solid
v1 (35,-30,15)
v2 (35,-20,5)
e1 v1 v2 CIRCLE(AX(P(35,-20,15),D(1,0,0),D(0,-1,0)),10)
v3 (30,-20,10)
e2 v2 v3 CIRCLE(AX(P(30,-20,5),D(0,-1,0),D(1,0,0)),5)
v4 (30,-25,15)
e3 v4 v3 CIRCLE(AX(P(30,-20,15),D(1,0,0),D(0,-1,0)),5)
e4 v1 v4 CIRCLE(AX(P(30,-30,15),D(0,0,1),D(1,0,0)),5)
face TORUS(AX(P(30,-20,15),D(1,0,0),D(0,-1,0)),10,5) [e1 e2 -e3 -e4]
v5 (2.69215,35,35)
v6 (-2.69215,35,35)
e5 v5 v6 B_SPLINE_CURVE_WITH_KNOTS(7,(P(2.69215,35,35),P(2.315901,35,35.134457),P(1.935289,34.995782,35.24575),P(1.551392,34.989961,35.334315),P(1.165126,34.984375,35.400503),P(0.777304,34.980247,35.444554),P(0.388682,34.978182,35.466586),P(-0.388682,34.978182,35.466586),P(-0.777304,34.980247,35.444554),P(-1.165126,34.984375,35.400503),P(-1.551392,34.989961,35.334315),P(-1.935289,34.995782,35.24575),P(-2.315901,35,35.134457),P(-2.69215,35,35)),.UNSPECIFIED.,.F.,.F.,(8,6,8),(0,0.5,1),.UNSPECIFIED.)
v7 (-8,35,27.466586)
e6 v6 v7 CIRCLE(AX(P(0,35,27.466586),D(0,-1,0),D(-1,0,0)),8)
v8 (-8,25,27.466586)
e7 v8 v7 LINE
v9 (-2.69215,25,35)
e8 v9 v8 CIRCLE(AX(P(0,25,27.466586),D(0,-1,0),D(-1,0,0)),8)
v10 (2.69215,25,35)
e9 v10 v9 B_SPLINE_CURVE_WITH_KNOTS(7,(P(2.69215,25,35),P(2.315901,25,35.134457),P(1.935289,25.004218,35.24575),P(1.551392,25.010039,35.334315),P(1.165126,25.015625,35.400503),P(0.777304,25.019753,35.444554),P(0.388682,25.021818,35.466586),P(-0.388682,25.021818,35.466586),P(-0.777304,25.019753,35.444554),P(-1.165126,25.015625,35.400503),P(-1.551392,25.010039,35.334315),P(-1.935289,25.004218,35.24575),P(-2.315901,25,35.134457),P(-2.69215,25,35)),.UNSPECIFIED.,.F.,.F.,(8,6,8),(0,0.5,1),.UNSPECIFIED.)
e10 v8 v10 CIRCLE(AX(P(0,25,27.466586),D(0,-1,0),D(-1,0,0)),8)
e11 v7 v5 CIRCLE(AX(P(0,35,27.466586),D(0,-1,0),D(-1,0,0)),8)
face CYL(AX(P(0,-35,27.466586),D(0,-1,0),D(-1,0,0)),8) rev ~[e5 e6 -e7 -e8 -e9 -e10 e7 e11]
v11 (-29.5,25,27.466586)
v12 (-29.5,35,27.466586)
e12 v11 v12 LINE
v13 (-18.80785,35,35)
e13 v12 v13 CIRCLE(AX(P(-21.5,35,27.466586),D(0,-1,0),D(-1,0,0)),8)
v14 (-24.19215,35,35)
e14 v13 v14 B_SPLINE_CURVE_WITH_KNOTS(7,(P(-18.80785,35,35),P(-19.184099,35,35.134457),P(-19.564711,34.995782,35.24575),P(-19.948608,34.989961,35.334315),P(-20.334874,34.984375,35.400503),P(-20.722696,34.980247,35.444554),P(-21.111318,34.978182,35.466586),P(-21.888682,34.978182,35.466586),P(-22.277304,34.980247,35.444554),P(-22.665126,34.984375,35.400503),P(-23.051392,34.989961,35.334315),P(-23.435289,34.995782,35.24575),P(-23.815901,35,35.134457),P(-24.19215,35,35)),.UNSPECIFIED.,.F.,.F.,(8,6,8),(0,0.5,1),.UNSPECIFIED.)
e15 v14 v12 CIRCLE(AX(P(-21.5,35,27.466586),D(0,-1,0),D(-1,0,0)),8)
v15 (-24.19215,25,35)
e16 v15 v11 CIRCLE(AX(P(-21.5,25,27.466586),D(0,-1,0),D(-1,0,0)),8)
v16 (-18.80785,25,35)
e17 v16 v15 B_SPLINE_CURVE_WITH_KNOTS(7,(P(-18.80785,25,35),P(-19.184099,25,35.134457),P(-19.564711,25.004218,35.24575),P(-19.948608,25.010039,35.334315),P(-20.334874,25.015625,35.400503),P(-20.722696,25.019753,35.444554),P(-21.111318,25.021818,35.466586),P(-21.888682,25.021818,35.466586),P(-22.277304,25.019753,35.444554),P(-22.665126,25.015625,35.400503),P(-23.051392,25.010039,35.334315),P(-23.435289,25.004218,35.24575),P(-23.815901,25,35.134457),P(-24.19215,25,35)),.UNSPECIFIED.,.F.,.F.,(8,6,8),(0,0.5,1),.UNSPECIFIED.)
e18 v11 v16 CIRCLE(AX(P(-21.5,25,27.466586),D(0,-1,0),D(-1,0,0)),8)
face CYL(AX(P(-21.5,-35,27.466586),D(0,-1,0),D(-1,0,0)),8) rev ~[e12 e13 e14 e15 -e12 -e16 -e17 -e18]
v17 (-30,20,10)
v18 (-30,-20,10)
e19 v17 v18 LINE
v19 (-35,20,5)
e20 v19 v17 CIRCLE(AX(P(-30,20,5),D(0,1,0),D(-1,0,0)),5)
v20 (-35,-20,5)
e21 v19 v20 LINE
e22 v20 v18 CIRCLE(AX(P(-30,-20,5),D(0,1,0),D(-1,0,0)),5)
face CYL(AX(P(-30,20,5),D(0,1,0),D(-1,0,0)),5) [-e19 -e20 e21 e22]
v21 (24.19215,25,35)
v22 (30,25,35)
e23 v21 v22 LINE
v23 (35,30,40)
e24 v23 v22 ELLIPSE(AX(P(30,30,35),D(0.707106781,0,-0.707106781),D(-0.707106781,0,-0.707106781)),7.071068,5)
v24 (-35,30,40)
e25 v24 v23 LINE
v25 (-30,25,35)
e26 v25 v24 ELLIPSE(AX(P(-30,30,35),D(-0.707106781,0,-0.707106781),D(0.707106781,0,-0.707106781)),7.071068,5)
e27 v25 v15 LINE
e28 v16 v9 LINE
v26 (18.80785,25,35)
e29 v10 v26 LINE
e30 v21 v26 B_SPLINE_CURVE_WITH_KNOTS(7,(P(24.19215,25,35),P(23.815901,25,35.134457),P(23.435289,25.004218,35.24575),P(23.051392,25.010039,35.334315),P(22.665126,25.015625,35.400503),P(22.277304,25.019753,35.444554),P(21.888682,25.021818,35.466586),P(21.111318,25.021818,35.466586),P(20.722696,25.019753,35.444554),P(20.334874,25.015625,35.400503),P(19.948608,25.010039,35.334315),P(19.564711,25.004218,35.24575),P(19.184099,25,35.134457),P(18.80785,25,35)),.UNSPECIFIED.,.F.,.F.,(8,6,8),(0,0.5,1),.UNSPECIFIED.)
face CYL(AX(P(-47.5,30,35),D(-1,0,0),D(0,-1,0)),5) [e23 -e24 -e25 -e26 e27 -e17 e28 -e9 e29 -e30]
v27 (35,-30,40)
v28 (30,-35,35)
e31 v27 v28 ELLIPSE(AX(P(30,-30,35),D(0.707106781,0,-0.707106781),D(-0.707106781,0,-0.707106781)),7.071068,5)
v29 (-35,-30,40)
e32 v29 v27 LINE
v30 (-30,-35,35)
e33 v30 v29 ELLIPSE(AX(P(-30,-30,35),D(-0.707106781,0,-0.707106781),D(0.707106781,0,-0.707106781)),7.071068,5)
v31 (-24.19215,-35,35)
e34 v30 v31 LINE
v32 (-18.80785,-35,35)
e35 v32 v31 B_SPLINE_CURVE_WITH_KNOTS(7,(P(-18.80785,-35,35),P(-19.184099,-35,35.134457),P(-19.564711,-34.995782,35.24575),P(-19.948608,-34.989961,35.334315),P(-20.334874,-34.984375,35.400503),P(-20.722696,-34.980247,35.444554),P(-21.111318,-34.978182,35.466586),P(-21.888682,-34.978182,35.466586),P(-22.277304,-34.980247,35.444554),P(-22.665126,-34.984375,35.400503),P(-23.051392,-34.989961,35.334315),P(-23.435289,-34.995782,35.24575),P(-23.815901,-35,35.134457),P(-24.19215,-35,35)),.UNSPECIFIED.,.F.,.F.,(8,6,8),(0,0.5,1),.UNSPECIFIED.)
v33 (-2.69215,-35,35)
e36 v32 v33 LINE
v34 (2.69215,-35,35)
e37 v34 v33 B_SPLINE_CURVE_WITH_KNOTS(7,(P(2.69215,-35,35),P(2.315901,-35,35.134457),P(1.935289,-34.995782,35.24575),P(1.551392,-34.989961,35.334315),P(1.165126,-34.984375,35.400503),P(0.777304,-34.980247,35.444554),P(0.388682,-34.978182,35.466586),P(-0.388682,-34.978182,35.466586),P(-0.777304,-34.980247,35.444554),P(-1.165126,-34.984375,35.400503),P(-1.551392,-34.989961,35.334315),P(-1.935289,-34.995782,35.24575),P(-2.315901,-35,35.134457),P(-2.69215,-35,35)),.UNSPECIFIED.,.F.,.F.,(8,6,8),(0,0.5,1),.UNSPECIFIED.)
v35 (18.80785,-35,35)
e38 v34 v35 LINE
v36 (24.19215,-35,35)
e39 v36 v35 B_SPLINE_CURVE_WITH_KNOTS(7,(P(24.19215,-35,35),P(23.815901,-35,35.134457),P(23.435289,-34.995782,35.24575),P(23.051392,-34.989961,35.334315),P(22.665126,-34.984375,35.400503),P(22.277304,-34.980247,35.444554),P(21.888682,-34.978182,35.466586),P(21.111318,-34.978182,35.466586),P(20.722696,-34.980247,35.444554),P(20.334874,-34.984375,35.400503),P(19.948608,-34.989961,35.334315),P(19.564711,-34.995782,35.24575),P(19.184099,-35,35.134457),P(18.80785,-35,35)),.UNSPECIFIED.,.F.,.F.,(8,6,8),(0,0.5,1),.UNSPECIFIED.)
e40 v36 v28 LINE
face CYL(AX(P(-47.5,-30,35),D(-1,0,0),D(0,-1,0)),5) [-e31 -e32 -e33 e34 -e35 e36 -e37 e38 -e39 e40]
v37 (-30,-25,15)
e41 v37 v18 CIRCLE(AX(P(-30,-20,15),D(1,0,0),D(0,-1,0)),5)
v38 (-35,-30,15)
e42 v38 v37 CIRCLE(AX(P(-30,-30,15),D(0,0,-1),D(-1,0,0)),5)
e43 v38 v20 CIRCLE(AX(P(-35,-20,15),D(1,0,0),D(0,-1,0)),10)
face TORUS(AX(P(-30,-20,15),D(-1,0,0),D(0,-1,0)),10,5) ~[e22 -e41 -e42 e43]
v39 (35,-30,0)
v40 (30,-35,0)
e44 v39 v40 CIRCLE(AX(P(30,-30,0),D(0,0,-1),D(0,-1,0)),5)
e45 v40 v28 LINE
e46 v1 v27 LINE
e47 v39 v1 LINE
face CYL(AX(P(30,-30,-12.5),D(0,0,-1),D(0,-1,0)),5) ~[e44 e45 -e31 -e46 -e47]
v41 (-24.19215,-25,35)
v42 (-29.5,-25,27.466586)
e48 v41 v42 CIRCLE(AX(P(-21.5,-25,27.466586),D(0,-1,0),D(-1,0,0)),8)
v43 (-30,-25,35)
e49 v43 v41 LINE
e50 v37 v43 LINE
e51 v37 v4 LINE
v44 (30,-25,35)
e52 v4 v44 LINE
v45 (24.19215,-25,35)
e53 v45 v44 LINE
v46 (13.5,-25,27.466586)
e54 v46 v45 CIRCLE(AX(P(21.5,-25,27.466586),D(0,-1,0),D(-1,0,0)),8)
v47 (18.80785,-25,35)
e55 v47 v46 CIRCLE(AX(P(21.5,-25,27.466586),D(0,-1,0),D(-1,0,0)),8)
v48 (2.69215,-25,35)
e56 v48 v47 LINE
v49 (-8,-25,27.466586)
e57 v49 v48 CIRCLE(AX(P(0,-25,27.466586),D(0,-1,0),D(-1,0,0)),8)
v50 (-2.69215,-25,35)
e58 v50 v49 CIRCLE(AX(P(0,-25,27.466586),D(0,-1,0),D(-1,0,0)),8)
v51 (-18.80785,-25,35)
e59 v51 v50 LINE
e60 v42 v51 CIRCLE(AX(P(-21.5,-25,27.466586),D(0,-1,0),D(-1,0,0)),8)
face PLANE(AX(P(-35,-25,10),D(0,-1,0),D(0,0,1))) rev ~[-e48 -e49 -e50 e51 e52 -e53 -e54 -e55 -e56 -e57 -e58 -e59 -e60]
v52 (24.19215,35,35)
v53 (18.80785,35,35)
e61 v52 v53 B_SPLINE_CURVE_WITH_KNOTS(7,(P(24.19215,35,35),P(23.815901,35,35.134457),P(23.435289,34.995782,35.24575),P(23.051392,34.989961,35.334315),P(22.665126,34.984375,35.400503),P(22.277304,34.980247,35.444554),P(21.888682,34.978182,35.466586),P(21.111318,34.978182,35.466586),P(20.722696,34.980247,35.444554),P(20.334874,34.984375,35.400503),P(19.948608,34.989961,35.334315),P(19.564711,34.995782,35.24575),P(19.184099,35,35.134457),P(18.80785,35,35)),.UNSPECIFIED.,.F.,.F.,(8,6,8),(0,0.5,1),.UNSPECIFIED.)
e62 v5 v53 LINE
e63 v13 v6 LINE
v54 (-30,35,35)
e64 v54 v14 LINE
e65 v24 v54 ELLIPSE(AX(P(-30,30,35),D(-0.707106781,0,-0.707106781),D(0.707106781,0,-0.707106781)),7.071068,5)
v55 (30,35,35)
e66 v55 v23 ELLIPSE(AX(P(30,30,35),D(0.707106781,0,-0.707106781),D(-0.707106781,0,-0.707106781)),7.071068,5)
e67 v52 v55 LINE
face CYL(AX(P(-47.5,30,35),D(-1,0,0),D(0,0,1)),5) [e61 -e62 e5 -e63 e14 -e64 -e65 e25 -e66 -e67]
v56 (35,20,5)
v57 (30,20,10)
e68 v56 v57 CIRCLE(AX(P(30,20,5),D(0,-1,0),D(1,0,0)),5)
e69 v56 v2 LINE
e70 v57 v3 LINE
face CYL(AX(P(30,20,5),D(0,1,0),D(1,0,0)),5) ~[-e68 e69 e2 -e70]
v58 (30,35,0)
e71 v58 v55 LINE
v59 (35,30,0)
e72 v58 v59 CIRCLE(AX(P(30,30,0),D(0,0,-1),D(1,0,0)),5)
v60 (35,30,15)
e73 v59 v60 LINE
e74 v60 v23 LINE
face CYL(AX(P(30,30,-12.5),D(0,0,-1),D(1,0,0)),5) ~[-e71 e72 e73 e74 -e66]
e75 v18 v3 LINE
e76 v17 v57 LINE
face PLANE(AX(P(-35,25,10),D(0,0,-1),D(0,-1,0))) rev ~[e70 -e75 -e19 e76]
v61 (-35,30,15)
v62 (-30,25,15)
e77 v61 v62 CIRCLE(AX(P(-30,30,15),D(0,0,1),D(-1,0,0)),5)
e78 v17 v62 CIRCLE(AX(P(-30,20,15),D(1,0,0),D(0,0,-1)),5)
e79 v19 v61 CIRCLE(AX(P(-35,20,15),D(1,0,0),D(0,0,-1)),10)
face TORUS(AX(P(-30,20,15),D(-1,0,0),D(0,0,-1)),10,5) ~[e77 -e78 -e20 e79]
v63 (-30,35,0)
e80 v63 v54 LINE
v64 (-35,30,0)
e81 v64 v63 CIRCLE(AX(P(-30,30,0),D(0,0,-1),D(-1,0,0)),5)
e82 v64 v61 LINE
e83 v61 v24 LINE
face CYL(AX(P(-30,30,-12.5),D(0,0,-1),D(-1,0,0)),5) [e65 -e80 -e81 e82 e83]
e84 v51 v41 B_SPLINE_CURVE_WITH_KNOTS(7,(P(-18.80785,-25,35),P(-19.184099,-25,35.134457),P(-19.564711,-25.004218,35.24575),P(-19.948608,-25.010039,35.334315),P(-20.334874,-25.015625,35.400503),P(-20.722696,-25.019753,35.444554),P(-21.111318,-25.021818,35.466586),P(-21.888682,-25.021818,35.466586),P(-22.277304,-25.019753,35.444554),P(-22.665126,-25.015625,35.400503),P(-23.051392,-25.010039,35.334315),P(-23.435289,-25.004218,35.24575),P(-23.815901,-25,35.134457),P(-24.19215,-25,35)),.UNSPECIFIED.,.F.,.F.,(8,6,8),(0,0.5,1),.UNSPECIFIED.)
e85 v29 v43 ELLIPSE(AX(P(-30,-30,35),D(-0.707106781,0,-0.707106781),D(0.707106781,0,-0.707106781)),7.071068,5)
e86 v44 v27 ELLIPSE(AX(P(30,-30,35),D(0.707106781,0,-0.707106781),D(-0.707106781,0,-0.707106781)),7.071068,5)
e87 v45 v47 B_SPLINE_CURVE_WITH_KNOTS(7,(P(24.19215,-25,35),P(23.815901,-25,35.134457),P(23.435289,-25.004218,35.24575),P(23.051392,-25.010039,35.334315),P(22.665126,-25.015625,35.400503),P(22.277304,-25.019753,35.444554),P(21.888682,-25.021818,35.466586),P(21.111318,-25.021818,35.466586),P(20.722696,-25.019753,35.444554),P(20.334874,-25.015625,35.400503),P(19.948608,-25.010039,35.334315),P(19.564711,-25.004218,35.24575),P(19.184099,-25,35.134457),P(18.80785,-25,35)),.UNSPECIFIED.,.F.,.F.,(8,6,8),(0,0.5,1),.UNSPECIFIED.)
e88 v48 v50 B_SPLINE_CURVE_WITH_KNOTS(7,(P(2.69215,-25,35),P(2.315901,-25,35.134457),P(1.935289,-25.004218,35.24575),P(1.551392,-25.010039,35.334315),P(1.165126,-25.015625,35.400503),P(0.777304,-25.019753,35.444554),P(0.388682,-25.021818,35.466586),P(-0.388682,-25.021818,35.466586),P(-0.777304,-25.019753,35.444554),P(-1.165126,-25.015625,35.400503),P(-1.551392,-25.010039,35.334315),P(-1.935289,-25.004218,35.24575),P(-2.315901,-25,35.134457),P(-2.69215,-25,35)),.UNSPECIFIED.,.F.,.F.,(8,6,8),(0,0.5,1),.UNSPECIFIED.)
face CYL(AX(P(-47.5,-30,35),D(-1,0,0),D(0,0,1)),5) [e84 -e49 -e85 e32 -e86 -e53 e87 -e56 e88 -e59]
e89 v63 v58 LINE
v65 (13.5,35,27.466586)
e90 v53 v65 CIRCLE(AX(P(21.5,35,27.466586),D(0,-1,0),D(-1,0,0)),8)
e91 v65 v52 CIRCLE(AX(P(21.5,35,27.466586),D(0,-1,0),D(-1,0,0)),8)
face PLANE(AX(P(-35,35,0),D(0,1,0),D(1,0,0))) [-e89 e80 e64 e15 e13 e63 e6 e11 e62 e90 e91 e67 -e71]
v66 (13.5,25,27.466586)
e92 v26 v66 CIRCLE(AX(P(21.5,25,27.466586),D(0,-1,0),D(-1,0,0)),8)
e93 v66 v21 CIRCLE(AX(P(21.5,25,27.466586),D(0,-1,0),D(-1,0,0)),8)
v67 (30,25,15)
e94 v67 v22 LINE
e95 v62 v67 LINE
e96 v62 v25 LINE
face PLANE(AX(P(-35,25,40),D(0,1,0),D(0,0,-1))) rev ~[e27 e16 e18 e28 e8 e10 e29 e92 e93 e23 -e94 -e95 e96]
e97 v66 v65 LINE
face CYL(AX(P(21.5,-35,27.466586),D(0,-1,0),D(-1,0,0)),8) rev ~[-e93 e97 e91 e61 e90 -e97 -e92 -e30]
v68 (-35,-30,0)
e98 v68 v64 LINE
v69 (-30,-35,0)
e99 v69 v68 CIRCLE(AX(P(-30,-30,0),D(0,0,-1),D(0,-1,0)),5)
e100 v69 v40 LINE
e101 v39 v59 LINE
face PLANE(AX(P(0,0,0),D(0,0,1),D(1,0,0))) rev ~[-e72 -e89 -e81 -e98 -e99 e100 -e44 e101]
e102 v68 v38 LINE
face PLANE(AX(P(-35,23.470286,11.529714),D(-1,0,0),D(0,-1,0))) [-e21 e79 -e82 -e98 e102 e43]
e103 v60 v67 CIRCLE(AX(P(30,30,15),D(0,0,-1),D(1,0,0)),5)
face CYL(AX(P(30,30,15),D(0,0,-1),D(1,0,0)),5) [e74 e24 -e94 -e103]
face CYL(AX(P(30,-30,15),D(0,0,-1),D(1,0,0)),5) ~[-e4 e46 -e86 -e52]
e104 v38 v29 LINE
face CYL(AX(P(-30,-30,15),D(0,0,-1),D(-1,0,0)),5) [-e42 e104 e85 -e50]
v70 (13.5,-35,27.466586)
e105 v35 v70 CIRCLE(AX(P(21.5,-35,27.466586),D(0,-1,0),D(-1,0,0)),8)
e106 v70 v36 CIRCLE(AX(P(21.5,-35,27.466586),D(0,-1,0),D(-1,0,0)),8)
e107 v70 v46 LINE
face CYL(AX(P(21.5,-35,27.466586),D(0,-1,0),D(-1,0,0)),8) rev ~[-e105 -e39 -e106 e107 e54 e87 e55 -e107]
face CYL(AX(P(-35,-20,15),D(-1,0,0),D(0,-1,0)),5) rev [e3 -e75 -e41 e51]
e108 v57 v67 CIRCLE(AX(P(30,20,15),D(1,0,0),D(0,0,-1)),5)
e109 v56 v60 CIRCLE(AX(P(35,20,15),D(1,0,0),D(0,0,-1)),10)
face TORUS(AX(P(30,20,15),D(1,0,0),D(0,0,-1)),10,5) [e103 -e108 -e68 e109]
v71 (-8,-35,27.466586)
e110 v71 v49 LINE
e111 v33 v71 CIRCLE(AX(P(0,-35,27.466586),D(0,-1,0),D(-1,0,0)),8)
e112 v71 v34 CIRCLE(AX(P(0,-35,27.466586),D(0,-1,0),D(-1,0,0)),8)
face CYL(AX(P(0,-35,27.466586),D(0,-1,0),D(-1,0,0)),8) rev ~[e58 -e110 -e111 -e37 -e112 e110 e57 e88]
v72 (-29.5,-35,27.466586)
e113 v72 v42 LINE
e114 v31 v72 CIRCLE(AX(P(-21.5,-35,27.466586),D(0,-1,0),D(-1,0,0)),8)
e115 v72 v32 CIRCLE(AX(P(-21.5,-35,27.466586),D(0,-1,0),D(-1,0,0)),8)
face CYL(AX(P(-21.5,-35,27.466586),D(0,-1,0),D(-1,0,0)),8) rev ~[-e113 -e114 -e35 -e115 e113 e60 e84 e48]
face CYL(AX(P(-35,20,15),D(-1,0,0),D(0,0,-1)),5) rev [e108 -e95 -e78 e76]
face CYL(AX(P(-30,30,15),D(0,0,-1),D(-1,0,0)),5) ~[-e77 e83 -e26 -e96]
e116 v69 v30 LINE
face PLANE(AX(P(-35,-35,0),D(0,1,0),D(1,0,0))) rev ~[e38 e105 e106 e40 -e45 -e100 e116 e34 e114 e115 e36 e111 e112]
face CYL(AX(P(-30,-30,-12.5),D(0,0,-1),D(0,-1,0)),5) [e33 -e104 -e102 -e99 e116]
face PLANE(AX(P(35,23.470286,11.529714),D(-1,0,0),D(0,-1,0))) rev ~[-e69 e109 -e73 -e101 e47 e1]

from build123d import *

# Parameters (mm, degrees)
F0_W         = 70
F0_H         = 70
F1_DEPTH     = 40
F3_DEPTH     = 78
F4_W         = 25
F4_H         = 17.3788098246
F5_DEPTH     = 72.2
F6_T1_DEPTH  = 70
F6_T3_DEPTH  = 40
F6_T5_DEPTH  = 65
F6_T7_DEPTH  = 37.5
F6_T9_DEPTH  = 95
F6_T12_ANGLE = 90
F6_T14_ANGLE = 90
F6_T16_ANGLE = 90
F6_T18_ANGLE = 90


# Not quite as in the source:
# - a fillet or chamfer that OpenCascade refuses, or shapes differently, is made with other operations: its cross-section is extruded or revolved along the edge and cut away or added
# - a feature names something its author has since deleted; it is built from what else it names


with BuildPart() as f1:
    # F0 (on Top) → F1 (new body)
    with BuildSketch(Plane.XY):
        Rectangle(F0_W, F0_H)
    extrude(amount=F1_DEPTH)

    # F2 (on face) → F3 (cut)
    with BuildSketch(Plane.XZ.offset(35)):
        with BuildLine():
            ThreePointArc((29.5, 27.4665858597), (21.5, 35.4665858597), (13.5, 27.4665858597))
            ThreePointArc((13.5, 27.4665858597), (21.5, 19.4665858597), (29.5, 27.4665858597))
        make_face()
        with BuildLine():
            ThreePointArc((8, 27.4665858597), (0, 35.4665858597), (-8, 27.4665858597))
            ThreePointArc((-8, 27.4665858597), (0, 19.4665858597), (8, 27.4665858597))
        make_face()
        with BuildLine():
            ThreePointArc((-13.5, 27.4665858597), (-21.5, 35.4665858597), (-29.5, 27.4665858597))
            ThreePointArc((-29.5, 27.4665858597), (-21.5, 19.4665858597), (-13.5, 27.4665858597))
        make_face()
    extrude(amount=-F3_DEPTH, mode=Mode.SUBTRACT)

    # F4 (on face) → F5 (cut)
    with BuildSketch(Plane(origin=(-35, 0, 0), x_dir=(0, -1, 0), z_dir=(-1, 0, 0))):
        with Locations((-12.5, 31.3105950877)):
            Rectangle(F4_W, F4_H)
        with Locations((12.5, 31.3105950877)):
            Rectangle(F4_W, F4_H)
        Polygon((25, 22.6211901754), (0, 22.6211901754), (-25, 22.6211901754), (-25, 10), (25, 10), align=None)
    extrude(amount=-F5_DEPTH, mode=Mode.SUBTRACT)

    # F6: fillet of radius 5 on 16 edges, made by hand

    # F6_s2 → F6_t1 (join)
    with BuildSketch(Plane.YZ.offset(-35)):
        with BuildLine():
            ThreePointArc((20, 10), (23.5355339059, 11.4644660941), (25, 15))
            Line((25, 15), (25, 10))
            Line((25, 10), (20, 10))
        make_face()
        with BuildLine():
            ThreePointArc((-25, 15), (-23.5355339059, 11.4644660941), (-20, 10))
            Line((-20, 10), (-25, 10))
            Line((-25, 10), (-25, 15))
        make_face()
    extrude(amount=F6_T1_DEPTH)

    # F6_s4 → F6_t3 (cut)
    with BuildSketch(Plane.XZ.offset(-20)):
        with BuildLine():
            ThreePointArc((35, 5), (33.5355339059, 8.5355339059), (30, 10))
            Line((30, 10), (35, 10))
            Line((35, 10), (35, 5))
        make_face()
        with BuildLine():
            ThreePointArc((-35, 5), (-33.5355339059, 8.5355339059), (-30, 10))
            Line((-30, 10), (-35, 10))
            Line((-35, 10), (-35, 5))
        make_face()
    extrude(amount=F6_T3_DEPTH, mode=Mode.SUBTRACT)

    # F6_s6 → F6_t5 (cut)
    with BuildSketch(Plane.XY.offset(-12.5)):
        with BuildLine():
            ThreePointArc((30, -35), (33.5355339059, -33.5355339059), (35, -30))
            Line((35, -30), (35, -35))
            Line((35, -35), (30, -35))
        make_face()
        with BuildLine():
            ThreePointArc((35, 30), (33.5355339059, 33.5355339059), (30, 35))
            Line((30, 35), (35, 35))
            Line((35, 35), (35, 30))
        make_face()
        with BuildLine():
            ThreePointArc((-35, 30), (-33.5355339059, 33.5355339059), (-30, 35))
            Line((-30, 35), (-35, 35))
            Line((-35, 35), (-35, 30))
        make_face()
        with BuildLine():
            ThreePointArc((-30, -35), (-33.5355339059, -33.5355339059), (-35, -30))
            Line((-35, -30), (-35, -35))
            Line((-35, -35), (-30, -35))
        make_face()
    extrude(amount=F6_T5_DEPTH, mode=Mode.SUBTRACT)

    # F6_s8 → F6_t7 (cut)
    with BuildSketch(Plane.XY.offset(15)):
        with BuildLine():
            ThreePointArc((-35, 30), (-33.5355339059, 26.4644660941), (-30, 25))
            Line((-30, 25), (-35, 25))
            Line((-35, 25), (-35, 30))
        make_face()
        with BuildLine():
            ThreePointArc((-35, -30), (-33.5355339059, -26.4644660941), (-30, -25))
            Line((-30, -25), (-35, -25))
            Line((-35, -25), (-35, -30))
        make_face()
        with BuildLine():
            ThreePointArc((35, 30), (33.5355339059, 26.4644660941), (30, 25))
            Line((30, 25), (35, 25))
            Line((35, 25), (35, 30))
        make_face()
        with BuildLine():
            ThreePointArc((35, -30), (33.5355339059, -26.4644660941), (30, -25))
            Line((30, -25), (35, -25))
            Line((35, -25), (35, -30))
        make_face()
    extrude(amount=F6_T7_DEPTH, mode=Mode.SUBTRACT)

    # F6_s10 → F6_t9 (cut)
    with BuildSketch(Plane.YZ.offset(-47.5)):
        with BuildLine():
            ThreePointArc((-30, 40), (-26.4644660941, 38.5355339059), (-25, 35))
            Line((-25, 35), (-25, 40))
            Line((-25, 40), (-30, 40))
        make_face()
        with BuildLine():
            ThreePointArc((-35, 35), (-33.5355339059, 38.5355339059), (-30, 40))
            Line((-30, 40), (-35, 40))
            Line((-35, 40), (-35, 35))
        make_face()
        with BuildLine():
            ThreePointArc((30, 40), (33.5355339059, 38.5355339059), (35, 35))
            Line((35, 35), (35, 40))
            Line((35, 40), (30, 40))
        make_face()
        with BuildLine():
            ThreePointArc((25, 35), (26.4644660941, 38.5355339059), (30, 40))
            Line((30, 40), (25, 40))
            Line((25, 40), (25, 35))
        make_face()
    extrude(amount=F6_T9_DEPTH, mode=Mode.SUBTRACT)

    # F6_s11 → F6_t12 (revolve, cut)
    with BuildSketch(Plane.XY.offset(15)):
        with BuildLine():
            ThreePointArc((35, -30), (33.5355339059, -26.4644660941), (30, -25))
            Line((30, -25), (35, -25))
            Line((35, -25), (35, -30))
        make_face()
    revolve(axis=Axis((35, -20, 15), (1, 0, 0)), revolution_arc=F6_T12_ANGLE, mode=Mode.SUBTRACT)

    # F6_s13 → F6_t14 (revolve, cut)
    with BuildSketch(Plane.XZ.offset(-20)):
        with BuildLine():
            ThreePointArc((35, 5), (33.5355339059, 8.5355339059), (30, 10))
            Line((30, 10), (35, 10))
            Line((35, 10), (35, 5))
        make_face()
    revolve(axis=Axis((35, 20, 15), (1, 0, 0)), revolution_arc=F6_T14_ANGLE, mode=Mode.SUBTRACT)

    # F6_s15 → F6_t16 (revolve, cut)
    with BuildSketch(Plane.XZ.offset(-20)):
        with BuildLine():
            ThreePointArc((-35, 5), (-33.5355339059, 8.5355339059), (-30, 10))
            Line((-30, 10), (-35, 10))
            Line((-35, 10), (-35, 5))
        make_face()
    revolve(axis=Axis((-35, 20, 15), (1, 0, 0)), revolution_arc=F6_T16_ANGLE, mode=Mode.SUBTRACT)

    # F6_s17 → F6_t18 (revolve, cut)
    with BuildSketch(Plane.XY.offset(15)):
        with BuildLine():
            ThreePointArc((-35, -30), (-33.5355339059, -26.4644660941), (-30, -25))
            Line((-30, -25), (-35, -25))
            Line((-35, -25), (-35, -30))
        make_face()
    revolve(axis=Axis((-35, -20, 15), (1, 0, 0)), revolution_arc=F6_T18_ANGLE, mode=Mode.SUBTRACT)


solid = f1.part
